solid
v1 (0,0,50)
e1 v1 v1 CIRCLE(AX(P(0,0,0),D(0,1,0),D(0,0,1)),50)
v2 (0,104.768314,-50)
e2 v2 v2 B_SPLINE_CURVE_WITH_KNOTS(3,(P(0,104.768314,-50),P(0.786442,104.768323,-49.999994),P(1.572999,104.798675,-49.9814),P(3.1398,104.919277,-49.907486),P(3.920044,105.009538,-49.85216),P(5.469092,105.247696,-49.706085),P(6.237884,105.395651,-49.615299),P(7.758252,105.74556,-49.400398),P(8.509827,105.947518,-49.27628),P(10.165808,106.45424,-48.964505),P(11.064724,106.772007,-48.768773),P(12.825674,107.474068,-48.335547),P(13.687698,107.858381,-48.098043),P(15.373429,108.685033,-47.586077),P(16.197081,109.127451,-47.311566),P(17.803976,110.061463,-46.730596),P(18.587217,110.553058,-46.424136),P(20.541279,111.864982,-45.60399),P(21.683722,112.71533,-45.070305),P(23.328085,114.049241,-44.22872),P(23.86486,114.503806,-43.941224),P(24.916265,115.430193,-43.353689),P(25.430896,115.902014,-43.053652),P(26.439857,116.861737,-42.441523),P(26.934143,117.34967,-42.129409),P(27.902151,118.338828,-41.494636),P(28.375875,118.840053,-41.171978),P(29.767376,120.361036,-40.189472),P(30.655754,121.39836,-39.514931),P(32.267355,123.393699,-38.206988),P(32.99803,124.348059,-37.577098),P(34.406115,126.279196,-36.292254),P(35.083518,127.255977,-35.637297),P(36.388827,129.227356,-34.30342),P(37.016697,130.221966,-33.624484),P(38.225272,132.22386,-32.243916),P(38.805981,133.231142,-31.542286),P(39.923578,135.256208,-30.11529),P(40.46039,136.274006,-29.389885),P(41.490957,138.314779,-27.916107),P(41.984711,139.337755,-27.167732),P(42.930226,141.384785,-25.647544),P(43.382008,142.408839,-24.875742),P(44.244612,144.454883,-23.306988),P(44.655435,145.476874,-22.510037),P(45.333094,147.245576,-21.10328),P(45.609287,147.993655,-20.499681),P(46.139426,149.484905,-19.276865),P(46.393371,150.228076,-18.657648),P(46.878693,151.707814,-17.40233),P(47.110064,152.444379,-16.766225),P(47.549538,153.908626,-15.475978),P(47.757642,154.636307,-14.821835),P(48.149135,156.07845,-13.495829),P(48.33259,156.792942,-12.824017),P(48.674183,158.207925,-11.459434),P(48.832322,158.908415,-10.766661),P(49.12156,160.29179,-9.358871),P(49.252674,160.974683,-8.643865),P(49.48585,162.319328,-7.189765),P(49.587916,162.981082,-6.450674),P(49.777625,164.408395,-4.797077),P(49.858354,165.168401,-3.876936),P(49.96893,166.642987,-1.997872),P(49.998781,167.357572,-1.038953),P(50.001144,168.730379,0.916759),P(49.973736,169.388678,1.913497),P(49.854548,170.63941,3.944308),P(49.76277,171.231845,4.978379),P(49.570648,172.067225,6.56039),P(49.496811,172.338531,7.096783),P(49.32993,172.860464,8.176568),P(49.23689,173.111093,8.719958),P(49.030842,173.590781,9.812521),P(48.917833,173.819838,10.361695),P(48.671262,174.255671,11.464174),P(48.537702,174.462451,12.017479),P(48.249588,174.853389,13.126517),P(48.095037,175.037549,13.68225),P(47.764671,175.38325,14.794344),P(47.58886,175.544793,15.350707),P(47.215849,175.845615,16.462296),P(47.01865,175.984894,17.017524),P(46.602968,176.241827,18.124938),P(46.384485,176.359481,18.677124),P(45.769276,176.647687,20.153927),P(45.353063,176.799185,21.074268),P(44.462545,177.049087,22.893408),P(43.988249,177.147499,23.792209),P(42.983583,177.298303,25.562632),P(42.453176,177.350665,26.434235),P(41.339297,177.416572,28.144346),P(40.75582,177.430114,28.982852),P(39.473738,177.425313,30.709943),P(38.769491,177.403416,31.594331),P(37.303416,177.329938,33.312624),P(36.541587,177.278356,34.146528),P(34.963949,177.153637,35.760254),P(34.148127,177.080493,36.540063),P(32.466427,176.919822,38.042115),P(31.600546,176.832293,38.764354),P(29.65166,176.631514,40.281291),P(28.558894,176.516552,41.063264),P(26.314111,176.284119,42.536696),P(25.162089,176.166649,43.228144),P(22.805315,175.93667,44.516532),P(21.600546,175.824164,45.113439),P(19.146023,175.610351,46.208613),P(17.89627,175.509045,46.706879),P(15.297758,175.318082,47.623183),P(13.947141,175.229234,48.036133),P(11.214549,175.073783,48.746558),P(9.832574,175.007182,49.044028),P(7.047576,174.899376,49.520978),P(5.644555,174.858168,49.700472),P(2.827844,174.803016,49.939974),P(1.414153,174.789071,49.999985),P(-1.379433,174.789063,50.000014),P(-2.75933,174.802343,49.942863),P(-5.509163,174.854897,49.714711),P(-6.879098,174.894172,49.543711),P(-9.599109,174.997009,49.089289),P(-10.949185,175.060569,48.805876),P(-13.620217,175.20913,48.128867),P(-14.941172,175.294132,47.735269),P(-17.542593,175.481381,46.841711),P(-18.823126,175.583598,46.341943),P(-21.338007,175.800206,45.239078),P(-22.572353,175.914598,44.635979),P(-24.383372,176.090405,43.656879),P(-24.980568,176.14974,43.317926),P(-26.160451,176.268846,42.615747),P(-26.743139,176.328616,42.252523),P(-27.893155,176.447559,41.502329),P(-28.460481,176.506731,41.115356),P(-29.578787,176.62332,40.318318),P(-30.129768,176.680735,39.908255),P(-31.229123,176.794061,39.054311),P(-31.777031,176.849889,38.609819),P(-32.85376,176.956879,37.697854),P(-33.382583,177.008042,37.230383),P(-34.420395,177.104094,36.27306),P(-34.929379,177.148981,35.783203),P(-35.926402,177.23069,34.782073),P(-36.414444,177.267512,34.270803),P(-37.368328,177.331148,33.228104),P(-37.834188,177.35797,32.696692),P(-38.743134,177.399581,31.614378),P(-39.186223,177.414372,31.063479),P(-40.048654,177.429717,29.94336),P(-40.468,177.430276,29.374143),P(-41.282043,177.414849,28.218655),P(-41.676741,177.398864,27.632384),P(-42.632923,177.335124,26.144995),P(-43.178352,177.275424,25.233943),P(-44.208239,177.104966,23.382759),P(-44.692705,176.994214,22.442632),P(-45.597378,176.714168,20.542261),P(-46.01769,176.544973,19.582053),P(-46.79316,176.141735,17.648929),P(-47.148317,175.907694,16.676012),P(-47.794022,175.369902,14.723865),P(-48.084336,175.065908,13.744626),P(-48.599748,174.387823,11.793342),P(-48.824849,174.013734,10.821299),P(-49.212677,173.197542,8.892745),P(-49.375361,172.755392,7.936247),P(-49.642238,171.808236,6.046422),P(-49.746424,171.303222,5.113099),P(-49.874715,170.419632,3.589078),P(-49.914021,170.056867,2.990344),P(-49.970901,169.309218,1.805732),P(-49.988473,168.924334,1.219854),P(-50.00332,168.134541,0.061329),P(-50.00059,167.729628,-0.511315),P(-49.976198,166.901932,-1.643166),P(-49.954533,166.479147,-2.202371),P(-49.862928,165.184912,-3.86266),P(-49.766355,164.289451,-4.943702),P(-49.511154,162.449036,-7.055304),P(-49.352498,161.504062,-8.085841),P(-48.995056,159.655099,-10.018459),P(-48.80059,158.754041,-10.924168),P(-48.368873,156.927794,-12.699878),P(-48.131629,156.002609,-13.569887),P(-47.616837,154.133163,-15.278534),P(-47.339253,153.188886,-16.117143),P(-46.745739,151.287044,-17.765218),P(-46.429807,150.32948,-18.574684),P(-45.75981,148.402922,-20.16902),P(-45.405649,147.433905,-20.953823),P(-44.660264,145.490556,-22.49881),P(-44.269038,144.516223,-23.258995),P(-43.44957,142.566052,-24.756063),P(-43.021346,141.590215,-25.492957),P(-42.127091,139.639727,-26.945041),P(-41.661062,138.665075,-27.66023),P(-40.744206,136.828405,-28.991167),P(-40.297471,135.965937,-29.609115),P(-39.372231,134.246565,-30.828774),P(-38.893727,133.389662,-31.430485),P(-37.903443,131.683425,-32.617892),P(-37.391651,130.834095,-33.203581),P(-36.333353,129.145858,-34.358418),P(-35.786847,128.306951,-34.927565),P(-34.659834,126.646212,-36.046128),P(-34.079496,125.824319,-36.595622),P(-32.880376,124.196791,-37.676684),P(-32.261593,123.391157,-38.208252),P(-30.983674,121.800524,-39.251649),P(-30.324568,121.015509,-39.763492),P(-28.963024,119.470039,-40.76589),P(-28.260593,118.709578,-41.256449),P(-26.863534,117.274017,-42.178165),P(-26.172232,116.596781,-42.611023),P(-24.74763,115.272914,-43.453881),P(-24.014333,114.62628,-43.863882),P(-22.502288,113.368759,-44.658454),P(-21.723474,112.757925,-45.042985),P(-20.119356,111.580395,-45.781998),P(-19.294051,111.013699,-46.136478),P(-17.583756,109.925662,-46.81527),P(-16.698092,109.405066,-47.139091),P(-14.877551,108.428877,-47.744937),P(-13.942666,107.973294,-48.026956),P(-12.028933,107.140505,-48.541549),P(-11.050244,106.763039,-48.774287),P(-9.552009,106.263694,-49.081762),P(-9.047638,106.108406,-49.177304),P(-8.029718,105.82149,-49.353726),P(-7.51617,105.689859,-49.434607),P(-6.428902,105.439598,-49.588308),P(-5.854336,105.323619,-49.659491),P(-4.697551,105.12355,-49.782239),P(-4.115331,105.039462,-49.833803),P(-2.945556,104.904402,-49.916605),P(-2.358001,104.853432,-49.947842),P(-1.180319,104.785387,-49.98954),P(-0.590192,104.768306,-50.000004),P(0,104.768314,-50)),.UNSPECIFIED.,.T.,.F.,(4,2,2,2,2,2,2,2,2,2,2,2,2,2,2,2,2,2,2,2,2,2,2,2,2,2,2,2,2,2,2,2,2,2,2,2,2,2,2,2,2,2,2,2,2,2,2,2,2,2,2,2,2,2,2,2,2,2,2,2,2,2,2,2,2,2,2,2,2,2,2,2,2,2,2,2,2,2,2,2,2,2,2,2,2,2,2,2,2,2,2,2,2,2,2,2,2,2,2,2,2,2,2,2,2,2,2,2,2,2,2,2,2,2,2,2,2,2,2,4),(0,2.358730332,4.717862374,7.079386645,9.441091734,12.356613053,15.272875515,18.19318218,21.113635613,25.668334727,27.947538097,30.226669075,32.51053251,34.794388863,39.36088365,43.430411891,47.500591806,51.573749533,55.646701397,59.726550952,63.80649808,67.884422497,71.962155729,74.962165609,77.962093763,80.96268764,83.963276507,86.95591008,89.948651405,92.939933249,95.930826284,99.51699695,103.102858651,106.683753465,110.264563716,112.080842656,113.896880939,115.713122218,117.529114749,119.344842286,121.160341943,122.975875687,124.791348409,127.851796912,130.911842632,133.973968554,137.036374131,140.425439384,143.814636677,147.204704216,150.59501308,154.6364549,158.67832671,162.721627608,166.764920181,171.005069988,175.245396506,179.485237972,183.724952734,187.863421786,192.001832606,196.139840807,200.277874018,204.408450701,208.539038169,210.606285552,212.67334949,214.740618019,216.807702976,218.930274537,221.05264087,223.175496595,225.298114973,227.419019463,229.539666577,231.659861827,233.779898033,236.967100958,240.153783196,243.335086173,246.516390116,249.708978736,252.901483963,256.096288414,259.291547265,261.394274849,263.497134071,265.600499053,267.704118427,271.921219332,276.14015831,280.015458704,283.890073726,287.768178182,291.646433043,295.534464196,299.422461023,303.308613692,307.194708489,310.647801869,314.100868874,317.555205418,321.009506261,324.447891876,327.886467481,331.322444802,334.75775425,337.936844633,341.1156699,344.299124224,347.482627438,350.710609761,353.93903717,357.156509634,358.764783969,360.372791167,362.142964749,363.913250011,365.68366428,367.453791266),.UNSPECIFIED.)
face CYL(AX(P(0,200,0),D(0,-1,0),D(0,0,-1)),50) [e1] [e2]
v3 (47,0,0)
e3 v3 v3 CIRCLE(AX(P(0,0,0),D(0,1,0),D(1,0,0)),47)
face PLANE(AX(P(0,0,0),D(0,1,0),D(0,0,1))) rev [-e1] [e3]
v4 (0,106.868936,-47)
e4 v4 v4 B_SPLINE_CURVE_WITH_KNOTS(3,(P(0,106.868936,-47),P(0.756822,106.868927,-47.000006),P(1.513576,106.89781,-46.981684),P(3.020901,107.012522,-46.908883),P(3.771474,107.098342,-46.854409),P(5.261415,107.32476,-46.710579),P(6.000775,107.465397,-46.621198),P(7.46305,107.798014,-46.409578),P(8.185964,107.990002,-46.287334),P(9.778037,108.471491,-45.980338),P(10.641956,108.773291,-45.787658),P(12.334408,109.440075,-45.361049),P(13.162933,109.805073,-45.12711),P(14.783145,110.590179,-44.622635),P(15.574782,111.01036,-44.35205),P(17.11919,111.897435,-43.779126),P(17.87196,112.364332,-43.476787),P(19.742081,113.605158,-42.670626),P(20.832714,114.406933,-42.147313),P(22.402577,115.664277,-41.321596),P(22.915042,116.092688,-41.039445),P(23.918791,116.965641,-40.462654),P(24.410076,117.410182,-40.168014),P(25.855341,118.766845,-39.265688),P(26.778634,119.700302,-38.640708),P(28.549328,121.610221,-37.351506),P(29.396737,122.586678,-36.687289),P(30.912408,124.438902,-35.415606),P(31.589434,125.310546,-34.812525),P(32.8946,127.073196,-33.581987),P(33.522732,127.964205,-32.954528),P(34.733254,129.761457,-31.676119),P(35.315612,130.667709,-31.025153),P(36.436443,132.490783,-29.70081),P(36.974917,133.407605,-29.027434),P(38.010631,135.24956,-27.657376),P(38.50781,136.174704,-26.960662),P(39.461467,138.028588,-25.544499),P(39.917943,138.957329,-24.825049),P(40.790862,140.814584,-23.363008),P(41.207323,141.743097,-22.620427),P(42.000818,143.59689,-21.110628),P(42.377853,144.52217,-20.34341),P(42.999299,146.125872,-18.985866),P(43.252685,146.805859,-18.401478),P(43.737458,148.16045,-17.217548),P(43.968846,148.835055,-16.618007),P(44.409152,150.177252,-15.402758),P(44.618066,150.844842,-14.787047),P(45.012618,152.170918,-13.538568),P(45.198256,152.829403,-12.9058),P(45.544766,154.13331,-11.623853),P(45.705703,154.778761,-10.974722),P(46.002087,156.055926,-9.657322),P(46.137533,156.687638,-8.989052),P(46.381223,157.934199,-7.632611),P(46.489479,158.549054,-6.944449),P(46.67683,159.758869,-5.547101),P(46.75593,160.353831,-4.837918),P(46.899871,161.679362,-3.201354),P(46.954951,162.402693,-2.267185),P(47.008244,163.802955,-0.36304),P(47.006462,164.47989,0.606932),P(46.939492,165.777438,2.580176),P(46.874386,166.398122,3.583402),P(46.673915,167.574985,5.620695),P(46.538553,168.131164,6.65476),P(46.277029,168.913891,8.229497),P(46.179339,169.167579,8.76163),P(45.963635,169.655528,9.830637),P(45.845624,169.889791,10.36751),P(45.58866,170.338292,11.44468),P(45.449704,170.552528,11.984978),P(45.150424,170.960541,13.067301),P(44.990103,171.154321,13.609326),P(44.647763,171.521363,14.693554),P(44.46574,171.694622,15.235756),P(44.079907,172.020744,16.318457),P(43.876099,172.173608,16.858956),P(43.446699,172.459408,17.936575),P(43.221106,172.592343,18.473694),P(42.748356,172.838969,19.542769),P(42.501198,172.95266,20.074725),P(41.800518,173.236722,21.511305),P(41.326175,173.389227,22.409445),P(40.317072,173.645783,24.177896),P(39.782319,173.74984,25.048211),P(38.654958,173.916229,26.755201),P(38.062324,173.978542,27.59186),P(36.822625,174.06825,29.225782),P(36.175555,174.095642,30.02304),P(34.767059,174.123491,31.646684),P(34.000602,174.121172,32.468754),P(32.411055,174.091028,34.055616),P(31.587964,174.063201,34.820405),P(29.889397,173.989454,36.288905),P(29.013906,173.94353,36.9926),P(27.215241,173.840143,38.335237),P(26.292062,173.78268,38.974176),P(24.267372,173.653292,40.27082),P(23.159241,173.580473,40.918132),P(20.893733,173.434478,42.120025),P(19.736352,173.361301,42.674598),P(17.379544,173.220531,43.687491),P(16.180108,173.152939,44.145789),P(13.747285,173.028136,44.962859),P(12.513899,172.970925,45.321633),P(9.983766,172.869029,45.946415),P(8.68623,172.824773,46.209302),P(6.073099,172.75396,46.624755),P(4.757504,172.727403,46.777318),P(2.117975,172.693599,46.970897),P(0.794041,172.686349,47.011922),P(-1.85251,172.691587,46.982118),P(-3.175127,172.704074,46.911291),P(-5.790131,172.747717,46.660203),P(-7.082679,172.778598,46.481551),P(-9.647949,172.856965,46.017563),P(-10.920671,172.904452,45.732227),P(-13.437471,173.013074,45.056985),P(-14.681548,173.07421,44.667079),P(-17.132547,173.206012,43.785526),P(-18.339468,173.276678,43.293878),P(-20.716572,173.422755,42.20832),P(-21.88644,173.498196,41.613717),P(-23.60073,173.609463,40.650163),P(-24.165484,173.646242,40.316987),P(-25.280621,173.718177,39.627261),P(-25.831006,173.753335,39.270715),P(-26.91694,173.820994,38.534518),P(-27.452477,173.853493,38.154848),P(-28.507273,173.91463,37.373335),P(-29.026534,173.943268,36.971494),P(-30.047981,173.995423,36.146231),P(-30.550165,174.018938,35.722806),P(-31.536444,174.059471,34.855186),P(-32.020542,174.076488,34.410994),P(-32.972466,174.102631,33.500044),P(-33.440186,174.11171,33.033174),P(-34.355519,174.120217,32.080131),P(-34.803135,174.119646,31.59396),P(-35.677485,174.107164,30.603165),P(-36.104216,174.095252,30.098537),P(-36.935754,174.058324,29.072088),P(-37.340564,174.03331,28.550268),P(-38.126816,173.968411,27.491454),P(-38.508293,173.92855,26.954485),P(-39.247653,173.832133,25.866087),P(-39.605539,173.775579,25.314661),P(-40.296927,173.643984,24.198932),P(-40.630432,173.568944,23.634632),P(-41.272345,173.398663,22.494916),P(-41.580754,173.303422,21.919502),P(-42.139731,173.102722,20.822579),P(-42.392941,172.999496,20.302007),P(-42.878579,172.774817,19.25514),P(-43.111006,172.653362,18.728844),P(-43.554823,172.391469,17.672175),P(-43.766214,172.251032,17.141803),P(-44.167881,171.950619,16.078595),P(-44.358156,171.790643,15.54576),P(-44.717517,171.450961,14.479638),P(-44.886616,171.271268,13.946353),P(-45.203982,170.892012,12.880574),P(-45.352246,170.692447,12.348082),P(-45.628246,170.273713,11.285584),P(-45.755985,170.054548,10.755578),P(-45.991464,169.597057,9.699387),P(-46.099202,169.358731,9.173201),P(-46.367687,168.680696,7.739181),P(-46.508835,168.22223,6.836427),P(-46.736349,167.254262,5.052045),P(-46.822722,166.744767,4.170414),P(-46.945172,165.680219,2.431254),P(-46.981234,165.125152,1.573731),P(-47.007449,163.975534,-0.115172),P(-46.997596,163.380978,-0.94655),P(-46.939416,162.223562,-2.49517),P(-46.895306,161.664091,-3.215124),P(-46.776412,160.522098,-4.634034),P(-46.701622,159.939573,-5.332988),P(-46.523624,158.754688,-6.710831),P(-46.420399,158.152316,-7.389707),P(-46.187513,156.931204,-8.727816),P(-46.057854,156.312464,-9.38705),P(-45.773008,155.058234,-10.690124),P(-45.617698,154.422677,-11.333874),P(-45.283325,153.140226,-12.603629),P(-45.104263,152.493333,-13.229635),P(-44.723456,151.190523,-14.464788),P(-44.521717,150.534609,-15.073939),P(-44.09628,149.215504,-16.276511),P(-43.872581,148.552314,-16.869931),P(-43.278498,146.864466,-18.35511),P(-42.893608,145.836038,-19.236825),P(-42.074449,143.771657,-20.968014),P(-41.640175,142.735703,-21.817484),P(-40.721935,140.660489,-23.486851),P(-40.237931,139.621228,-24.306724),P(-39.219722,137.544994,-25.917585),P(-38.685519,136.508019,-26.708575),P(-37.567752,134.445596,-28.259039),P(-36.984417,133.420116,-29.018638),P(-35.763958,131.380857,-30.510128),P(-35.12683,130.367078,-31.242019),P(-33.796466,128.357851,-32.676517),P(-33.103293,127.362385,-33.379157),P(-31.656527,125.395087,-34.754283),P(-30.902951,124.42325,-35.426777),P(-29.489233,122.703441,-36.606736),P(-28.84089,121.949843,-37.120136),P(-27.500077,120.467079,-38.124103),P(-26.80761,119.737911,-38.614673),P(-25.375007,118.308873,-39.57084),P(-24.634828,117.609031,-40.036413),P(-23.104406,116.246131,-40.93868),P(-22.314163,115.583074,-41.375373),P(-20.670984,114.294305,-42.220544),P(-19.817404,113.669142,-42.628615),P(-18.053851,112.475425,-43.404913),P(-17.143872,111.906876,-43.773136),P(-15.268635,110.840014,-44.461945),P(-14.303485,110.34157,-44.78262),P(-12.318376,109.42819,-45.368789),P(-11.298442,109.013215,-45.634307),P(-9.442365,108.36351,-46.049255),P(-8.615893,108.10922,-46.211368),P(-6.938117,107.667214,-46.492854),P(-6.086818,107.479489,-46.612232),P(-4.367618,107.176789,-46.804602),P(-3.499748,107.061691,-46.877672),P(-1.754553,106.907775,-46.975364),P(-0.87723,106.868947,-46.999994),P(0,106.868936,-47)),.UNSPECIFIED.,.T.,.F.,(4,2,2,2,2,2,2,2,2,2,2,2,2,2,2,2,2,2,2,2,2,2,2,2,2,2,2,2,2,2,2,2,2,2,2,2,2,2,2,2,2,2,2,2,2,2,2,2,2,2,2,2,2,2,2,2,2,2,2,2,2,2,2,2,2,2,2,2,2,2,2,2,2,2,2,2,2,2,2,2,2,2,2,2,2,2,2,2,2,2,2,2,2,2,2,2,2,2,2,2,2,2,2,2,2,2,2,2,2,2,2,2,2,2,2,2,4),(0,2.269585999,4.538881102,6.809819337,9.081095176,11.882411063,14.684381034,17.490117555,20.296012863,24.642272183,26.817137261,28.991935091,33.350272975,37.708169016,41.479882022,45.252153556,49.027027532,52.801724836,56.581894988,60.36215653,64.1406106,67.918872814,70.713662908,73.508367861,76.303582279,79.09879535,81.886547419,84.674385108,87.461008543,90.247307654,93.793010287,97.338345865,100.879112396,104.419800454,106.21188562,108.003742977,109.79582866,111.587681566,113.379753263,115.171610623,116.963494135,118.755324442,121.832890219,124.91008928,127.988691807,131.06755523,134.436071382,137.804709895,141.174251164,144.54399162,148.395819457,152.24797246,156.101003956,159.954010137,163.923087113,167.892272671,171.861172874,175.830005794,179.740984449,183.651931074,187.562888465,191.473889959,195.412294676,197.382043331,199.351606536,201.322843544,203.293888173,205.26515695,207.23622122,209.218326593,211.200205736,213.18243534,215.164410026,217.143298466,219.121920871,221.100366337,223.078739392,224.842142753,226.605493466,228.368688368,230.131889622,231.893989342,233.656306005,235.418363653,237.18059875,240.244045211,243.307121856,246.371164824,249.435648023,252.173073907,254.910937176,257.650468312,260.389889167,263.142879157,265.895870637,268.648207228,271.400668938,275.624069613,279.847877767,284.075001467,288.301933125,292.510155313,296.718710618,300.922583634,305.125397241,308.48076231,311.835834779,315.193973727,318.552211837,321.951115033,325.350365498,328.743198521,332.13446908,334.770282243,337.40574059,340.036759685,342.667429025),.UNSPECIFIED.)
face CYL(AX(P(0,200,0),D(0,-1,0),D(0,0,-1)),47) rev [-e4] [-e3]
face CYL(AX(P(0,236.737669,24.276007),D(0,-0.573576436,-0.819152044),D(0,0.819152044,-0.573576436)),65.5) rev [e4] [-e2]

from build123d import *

# Parameters (mm, degrees)
EXTRUDE_1_OUTLINE_R      = 50
EXTRUDE_1_OUTLINE_R_2    = 47
EXTRUDE_1_DEPTH          = 200
CUT_EXTRUDE_1_DEPTH      = 213.132034356
CUT_EXTRUDE_1_DEPTH_BACK = 213.132034356
SKETCH_2_R               = 65.5


# Read off the part's stored shape, not the designer's step: Вытянуть-Тонкостенный1
with BuildPart() as part:
    # Вытянуть-Тонкостенный1 outline → Вытянуть-Тонкостенный1 (new body)
    with BuildSketch(Plane(origin=(0, 0, 0), x_dir=(1, 0, 0), z_dir=(0, 1, 0))):
        Circle(EXTRUDE_1_OUTLINE_R)
        Circle(EXTRUDE_1_OUTLINE_R_2, mode=Mode.SUBTRACT)
    extrude(amount=EXTRUDE_1_DEPTH)

    # Эскиз2 → Вырез-Вытянуть1 (cut, two sides: drawn at the far end of the back side and taken through both)
    with BuildSketch(Plane(origin=(0, 0, 0), x_dir=(1, 0, 0), z_dir=(0, -0.5735764363510444, -0.819152044288993)).offset(-CUT_EXTRUDE_1_DEPTH_BACK)):
        with Locations((0, -180)):
            Circle(SKETCH_2_R)
    extrude(amount=CUT_EXTRUDE_1_DEPTH + CUT_EXTRUDE_1_DEPTH_BACK, mode=Mode.SUBTRACT)


solid = part.part
